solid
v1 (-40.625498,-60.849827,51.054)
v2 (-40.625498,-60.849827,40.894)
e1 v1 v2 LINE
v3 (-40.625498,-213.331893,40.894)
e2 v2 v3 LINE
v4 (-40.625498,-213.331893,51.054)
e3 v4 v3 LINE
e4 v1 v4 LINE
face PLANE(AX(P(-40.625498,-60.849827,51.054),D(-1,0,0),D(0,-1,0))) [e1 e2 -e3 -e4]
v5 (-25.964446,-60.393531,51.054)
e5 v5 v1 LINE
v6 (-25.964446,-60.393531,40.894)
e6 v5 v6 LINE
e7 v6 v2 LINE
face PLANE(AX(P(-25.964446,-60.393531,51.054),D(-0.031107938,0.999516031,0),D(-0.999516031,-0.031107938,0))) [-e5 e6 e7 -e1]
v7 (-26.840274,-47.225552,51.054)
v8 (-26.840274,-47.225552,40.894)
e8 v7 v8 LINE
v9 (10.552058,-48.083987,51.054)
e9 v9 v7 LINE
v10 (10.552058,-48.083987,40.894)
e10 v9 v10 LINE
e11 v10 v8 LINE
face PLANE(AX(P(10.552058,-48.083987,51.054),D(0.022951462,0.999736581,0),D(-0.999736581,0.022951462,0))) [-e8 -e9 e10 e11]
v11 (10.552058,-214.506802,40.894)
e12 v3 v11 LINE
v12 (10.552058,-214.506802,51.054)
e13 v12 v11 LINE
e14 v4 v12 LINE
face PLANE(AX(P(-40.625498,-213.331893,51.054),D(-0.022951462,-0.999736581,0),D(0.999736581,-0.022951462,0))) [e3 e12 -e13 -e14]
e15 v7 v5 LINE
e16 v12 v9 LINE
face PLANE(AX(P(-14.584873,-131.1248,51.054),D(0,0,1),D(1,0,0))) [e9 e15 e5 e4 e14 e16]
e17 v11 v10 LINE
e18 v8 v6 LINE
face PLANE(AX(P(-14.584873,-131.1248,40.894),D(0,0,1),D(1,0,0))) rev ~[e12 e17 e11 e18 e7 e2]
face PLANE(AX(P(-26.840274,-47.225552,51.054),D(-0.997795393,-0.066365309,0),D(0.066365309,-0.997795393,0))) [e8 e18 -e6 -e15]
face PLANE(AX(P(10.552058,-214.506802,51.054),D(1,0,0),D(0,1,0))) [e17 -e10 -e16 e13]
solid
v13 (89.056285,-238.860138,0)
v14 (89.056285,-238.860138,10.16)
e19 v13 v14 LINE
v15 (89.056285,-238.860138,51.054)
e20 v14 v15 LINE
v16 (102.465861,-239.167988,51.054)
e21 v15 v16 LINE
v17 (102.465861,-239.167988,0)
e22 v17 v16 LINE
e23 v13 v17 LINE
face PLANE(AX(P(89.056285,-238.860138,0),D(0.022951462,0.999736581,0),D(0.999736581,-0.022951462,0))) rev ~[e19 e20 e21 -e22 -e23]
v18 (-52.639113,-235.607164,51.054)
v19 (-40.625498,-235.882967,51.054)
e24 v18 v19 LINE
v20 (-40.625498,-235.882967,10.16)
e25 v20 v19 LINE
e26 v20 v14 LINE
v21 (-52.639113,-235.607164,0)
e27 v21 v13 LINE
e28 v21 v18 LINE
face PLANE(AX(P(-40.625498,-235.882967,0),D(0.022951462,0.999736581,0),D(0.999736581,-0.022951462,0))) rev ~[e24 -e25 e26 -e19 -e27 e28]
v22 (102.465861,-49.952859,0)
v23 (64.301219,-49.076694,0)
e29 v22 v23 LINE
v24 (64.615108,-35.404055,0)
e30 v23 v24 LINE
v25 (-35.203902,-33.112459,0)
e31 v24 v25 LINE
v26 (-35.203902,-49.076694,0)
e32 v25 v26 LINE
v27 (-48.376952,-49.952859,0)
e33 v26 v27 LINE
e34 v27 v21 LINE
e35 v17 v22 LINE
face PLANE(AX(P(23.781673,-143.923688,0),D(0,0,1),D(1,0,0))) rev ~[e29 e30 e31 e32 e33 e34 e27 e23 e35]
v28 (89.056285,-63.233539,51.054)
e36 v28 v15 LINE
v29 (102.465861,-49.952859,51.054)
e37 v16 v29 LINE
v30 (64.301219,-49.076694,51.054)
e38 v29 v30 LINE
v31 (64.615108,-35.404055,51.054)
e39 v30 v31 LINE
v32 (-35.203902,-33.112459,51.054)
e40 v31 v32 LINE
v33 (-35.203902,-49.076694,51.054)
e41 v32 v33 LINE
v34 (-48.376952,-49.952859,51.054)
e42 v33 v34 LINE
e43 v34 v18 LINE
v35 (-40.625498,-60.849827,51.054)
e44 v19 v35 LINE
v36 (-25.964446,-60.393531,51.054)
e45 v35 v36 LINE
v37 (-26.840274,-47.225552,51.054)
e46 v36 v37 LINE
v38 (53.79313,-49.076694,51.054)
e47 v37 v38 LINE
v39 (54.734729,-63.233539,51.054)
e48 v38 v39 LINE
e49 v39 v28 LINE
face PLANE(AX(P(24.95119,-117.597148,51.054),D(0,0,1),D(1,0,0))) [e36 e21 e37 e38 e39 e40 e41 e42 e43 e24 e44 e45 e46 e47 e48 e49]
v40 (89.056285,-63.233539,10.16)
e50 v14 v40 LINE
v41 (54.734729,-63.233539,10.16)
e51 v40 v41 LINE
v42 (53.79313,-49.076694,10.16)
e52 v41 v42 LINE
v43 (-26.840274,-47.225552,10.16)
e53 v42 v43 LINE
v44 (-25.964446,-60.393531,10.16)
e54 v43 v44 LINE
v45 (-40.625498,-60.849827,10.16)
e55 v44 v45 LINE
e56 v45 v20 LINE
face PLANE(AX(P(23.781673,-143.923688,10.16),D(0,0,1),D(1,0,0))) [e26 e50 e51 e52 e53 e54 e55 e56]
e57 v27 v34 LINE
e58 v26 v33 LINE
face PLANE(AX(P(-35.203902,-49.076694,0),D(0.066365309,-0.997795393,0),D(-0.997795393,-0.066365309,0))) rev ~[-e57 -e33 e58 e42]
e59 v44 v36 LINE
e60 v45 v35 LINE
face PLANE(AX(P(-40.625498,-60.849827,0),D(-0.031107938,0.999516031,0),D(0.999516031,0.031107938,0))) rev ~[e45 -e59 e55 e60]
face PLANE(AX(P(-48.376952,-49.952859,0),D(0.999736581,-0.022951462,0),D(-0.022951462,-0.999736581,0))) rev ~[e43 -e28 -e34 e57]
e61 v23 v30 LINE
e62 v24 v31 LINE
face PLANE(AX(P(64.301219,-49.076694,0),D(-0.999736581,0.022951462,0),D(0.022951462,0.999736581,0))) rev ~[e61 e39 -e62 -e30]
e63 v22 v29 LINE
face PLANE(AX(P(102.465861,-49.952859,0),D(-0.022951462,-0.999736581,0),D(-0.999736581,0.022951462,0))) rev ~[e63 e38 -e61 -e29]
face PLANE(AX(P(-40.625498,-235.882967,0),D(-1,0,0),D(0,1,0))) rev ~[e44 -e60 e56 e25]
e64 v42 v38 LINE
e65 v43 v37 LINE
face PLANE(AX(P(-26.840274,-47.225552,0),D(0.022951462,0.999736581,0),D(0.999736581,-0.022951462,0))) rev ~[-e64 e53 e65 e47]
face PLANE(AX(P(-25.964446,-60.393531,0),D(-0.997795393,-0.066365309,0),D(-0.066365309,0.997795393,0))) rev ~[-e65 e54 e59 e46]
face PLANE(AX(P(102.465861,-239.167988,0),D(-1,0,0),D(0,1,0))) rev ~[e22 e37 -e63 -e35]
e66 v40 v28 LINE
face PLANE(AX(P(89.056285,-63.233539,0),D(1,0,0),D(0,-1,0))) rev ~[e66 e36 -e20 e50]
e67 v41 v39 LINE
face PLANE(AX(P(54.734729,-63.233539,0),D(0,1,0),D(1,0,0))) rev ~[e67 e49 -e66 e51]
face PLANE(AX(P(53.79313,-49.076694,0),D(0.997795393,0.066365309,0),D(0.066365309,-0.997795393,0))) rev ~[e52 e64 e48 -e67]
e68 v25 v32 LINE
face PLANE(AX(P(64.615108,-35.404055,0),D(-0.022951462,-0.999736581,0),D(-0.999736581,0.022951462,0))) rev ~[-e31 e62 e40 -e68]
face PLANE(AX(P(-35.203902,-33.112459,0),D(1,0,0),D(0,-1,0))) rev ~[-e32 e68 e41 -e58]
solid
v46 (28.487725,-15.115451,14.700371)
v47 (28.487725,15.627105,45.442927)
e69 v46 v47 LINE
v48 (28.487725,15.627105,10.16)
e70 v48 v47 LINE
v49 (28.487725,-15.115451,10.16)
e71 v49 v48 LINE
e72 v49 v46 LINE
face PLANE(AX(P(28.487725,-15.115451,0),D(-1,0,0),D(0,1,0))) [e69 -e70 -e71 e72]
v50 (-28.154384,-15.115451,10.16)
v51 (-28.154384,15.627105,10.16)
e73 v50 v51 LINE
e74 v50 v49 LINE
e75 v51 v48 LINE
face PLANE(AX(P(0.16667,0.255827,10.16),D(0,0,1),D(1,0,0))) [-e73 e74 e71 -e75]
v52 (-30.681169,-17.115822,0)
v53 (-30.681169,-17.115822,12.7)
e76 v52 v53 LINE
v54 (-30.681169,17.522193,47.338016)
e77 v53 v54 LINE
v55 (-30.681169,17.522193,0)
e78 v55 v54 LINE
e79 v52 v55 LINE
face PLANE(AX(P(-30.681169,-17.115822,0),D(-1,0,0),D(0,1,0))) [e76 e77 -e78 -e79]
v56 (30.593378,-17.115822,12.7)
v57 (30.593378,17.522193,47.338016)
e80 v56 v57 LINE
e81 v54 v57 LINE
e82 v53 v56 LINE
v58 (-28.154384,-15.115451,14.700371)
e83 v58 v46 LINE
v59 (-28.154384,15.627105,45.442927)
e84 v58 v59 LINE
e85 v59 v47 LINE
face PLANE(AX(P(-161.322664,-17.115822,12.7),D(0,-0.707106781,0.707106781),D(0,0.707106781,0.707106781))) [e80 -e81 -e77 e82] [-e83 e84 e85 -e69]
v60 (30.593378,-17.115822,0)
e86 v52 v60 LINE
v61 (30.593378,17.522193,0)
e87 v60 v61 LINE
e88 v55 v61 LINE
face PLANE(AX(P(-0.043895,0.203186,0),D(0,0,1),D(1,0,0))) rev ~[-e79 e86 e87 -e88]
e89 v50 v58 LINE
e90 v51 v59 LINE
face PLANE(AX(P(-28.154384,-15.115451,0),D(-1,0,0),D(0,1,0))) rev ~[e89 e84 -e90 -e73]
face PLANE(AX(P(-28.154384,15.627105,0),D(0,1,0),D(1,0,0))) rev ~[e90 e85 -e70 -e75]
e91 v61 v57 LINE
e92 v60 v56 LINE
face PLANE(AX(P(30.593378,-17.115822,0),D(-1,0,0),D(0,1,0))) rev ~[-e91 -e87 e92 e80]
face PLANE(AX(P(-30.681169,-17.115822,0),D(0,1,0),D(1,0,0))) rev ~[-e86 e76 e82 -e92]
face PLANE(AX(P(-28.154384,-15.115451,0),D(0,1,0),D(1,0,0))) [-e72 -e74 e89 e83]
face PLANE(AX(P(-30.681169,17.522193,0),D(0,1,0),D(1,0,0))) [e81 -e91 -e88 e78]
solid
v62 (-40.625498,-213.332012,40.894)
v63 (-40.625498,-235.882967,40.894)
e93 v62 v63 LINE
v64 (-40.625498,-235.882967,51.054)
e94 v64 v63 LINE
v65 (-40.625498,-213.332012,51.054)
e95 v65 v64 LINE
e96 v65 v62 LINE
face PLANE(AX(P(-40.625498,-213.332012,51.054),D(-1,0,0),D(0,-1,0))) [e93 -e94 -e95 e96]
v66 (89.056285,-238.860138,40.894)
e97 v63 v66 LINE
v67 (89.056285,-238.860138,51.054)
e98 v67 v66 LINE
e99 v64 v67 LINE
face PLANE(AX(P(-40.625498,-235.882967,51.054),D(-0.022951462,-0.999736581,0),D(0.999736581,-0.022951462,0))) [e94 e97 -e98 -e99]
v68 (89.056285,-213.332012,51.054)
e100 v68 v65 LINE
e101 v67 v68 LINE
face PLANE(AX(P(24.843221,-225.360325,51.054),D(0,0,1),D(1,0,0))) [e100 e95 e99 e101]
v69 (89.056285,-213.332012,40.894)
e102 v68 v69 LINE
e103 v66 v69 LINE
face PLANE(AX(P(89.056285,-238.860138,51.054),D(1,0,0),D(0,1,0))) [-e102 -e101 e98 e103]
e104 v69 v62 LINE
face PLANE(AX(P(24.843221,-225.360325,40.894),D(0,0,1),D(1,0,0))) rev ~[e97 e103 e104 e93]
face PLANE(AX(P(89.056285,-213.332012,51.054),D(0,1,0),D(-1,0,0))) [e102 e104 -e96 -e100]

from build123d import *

# Parameters (mm, degrees)
F1_DEPTH     = 51.054
F2_DEPTH     = 10.16
F4_DEPTH     = 10.16
F6_DEPTH     = 10.16
F7_W         = 56.6421095282
F7_H         = 30.7425558567
F8_DEPTH     = 10.16
F7_W_2       = 61.2745471299
F7_H_2       = 34.6380155534
F9_DEPTH     = 63.5
F10_T1_DEPTH = 322.5575387072


# Not quite as in the source:
# - a fillet or chamfer that OpenCascade refuses, or shapes differently, is made with other operations: its cross-section is extruded or revolved along the edge and cut away or added


with BuildPart() as f1:
    # F0 (on Top) → F1 (new body)
    with BuildSketch(Plane.XY):
        Polygon((-35.2039023449, -49.0766943542), (-48.3769522073, -49.9528594767), (-52.6391126395, -235.6071644364), (-40.6254976988, -235.8829671131), (-40.6254976988, -60.8498267829), (-25.9644463658, -60.3935308754), (-26.8402741919, -47.2255522284), (53.7931299761, -49.0766943542), (54.7347292304, -63.2335394621), (89.056285343, -63.2335394621), (89.056285343, -238.8601378529), (102.4658605456, -239.1679883003), (102.4658605456, -49.9528594767), (64.3012185928, -49.0766943542), (64.6151083374, -35.4040550191), (-35.2039023449, -33.1124591533), align=None)
    extrude(amount=F1_DEPTH)

    # F0 (on Top) → F2 (join)
    with BuildSketch(Plane.XY):
        Polygon((-40.6254976988, -60.8498267829), (-40.6254976988, -235.8829671131), (89.056285343, -238.8601378529), (89.056285343, -63.2335394621), (54.7347292304, -63.2335394621), (53.7931299761, -49.0766943542), (-26.8402741919, -47.2255522284), (-25.9644463658, -60.3935308754), align=None)
    extrude(amount=F2_DEPTH)


with BuildPart() as f4:
    # F3 (on face) → F4 (new body)
    with BuildSketch(Plane.XY.offset(51.054)):
        Polygon((-40.6254976988, -213.3320122957), (-40.6254976988, -235.8829671131), (89.056285343, -238.8601378529), (89.056285343, -213.3320122957), align=None)
    extrude(amount=-F4_DEPTH)


with BuildPart() as f6:
    # F5 (on face) → F6 (new body)
    with BuildSketch(Plane.XY.offset(51.054)):
        Polygon((-40.6254976988, -60.8498267829), (-40.6254976988, -213.3318930864), (10.5520575639, -214.5068022872), (10.5520575639, -48.0839870323), (-26.8402741919, -47.2255522284), (-25.9644463658, -60.3935308754), align=None)
    extrude(amount=-F6_DEPTH)


with BuildPart() as f8:
    # F7 (on Top) → F8 (new body)
    with BuildSketch(Plane.XY):
        with Locations((0.1666704193, 0.2558268607)):
            Rectangle(F7_W, F7_H)
    extrude(amount=F8_DEPTH)

    # F7 (on Top) → F9 (join)
    with BuildSketch(Plane.XY):
        with Locations((-0.0438950956, 0.2031857148)):
            Rectangle(F7_W_2, F7_H_2)
        with Locations((0.1666704193, 0.2558268607)):
            Rectangle(F7_W, F7_H, mode=Mode.SUBTRACT)
    extrude(amount=F9_DEPTH)

    # F10: chamfer of 50.8 on 1 edges, made by hand

    # F10_s2 → F10_t1 (cut)
    with BuildSketch(Plane.YZ.offset(-161.3226644492)):
        Polygon((-17.1158220619, 12.7), (33.6841779381, 63.5), (-17.1158220619, 63.5), align=None)
    extrude(amount=F10_T1_DEPTH, mode=Mode.SUBTRACT)


solid = Compound([f1.part, f4.part, f6.part, f8.part])
